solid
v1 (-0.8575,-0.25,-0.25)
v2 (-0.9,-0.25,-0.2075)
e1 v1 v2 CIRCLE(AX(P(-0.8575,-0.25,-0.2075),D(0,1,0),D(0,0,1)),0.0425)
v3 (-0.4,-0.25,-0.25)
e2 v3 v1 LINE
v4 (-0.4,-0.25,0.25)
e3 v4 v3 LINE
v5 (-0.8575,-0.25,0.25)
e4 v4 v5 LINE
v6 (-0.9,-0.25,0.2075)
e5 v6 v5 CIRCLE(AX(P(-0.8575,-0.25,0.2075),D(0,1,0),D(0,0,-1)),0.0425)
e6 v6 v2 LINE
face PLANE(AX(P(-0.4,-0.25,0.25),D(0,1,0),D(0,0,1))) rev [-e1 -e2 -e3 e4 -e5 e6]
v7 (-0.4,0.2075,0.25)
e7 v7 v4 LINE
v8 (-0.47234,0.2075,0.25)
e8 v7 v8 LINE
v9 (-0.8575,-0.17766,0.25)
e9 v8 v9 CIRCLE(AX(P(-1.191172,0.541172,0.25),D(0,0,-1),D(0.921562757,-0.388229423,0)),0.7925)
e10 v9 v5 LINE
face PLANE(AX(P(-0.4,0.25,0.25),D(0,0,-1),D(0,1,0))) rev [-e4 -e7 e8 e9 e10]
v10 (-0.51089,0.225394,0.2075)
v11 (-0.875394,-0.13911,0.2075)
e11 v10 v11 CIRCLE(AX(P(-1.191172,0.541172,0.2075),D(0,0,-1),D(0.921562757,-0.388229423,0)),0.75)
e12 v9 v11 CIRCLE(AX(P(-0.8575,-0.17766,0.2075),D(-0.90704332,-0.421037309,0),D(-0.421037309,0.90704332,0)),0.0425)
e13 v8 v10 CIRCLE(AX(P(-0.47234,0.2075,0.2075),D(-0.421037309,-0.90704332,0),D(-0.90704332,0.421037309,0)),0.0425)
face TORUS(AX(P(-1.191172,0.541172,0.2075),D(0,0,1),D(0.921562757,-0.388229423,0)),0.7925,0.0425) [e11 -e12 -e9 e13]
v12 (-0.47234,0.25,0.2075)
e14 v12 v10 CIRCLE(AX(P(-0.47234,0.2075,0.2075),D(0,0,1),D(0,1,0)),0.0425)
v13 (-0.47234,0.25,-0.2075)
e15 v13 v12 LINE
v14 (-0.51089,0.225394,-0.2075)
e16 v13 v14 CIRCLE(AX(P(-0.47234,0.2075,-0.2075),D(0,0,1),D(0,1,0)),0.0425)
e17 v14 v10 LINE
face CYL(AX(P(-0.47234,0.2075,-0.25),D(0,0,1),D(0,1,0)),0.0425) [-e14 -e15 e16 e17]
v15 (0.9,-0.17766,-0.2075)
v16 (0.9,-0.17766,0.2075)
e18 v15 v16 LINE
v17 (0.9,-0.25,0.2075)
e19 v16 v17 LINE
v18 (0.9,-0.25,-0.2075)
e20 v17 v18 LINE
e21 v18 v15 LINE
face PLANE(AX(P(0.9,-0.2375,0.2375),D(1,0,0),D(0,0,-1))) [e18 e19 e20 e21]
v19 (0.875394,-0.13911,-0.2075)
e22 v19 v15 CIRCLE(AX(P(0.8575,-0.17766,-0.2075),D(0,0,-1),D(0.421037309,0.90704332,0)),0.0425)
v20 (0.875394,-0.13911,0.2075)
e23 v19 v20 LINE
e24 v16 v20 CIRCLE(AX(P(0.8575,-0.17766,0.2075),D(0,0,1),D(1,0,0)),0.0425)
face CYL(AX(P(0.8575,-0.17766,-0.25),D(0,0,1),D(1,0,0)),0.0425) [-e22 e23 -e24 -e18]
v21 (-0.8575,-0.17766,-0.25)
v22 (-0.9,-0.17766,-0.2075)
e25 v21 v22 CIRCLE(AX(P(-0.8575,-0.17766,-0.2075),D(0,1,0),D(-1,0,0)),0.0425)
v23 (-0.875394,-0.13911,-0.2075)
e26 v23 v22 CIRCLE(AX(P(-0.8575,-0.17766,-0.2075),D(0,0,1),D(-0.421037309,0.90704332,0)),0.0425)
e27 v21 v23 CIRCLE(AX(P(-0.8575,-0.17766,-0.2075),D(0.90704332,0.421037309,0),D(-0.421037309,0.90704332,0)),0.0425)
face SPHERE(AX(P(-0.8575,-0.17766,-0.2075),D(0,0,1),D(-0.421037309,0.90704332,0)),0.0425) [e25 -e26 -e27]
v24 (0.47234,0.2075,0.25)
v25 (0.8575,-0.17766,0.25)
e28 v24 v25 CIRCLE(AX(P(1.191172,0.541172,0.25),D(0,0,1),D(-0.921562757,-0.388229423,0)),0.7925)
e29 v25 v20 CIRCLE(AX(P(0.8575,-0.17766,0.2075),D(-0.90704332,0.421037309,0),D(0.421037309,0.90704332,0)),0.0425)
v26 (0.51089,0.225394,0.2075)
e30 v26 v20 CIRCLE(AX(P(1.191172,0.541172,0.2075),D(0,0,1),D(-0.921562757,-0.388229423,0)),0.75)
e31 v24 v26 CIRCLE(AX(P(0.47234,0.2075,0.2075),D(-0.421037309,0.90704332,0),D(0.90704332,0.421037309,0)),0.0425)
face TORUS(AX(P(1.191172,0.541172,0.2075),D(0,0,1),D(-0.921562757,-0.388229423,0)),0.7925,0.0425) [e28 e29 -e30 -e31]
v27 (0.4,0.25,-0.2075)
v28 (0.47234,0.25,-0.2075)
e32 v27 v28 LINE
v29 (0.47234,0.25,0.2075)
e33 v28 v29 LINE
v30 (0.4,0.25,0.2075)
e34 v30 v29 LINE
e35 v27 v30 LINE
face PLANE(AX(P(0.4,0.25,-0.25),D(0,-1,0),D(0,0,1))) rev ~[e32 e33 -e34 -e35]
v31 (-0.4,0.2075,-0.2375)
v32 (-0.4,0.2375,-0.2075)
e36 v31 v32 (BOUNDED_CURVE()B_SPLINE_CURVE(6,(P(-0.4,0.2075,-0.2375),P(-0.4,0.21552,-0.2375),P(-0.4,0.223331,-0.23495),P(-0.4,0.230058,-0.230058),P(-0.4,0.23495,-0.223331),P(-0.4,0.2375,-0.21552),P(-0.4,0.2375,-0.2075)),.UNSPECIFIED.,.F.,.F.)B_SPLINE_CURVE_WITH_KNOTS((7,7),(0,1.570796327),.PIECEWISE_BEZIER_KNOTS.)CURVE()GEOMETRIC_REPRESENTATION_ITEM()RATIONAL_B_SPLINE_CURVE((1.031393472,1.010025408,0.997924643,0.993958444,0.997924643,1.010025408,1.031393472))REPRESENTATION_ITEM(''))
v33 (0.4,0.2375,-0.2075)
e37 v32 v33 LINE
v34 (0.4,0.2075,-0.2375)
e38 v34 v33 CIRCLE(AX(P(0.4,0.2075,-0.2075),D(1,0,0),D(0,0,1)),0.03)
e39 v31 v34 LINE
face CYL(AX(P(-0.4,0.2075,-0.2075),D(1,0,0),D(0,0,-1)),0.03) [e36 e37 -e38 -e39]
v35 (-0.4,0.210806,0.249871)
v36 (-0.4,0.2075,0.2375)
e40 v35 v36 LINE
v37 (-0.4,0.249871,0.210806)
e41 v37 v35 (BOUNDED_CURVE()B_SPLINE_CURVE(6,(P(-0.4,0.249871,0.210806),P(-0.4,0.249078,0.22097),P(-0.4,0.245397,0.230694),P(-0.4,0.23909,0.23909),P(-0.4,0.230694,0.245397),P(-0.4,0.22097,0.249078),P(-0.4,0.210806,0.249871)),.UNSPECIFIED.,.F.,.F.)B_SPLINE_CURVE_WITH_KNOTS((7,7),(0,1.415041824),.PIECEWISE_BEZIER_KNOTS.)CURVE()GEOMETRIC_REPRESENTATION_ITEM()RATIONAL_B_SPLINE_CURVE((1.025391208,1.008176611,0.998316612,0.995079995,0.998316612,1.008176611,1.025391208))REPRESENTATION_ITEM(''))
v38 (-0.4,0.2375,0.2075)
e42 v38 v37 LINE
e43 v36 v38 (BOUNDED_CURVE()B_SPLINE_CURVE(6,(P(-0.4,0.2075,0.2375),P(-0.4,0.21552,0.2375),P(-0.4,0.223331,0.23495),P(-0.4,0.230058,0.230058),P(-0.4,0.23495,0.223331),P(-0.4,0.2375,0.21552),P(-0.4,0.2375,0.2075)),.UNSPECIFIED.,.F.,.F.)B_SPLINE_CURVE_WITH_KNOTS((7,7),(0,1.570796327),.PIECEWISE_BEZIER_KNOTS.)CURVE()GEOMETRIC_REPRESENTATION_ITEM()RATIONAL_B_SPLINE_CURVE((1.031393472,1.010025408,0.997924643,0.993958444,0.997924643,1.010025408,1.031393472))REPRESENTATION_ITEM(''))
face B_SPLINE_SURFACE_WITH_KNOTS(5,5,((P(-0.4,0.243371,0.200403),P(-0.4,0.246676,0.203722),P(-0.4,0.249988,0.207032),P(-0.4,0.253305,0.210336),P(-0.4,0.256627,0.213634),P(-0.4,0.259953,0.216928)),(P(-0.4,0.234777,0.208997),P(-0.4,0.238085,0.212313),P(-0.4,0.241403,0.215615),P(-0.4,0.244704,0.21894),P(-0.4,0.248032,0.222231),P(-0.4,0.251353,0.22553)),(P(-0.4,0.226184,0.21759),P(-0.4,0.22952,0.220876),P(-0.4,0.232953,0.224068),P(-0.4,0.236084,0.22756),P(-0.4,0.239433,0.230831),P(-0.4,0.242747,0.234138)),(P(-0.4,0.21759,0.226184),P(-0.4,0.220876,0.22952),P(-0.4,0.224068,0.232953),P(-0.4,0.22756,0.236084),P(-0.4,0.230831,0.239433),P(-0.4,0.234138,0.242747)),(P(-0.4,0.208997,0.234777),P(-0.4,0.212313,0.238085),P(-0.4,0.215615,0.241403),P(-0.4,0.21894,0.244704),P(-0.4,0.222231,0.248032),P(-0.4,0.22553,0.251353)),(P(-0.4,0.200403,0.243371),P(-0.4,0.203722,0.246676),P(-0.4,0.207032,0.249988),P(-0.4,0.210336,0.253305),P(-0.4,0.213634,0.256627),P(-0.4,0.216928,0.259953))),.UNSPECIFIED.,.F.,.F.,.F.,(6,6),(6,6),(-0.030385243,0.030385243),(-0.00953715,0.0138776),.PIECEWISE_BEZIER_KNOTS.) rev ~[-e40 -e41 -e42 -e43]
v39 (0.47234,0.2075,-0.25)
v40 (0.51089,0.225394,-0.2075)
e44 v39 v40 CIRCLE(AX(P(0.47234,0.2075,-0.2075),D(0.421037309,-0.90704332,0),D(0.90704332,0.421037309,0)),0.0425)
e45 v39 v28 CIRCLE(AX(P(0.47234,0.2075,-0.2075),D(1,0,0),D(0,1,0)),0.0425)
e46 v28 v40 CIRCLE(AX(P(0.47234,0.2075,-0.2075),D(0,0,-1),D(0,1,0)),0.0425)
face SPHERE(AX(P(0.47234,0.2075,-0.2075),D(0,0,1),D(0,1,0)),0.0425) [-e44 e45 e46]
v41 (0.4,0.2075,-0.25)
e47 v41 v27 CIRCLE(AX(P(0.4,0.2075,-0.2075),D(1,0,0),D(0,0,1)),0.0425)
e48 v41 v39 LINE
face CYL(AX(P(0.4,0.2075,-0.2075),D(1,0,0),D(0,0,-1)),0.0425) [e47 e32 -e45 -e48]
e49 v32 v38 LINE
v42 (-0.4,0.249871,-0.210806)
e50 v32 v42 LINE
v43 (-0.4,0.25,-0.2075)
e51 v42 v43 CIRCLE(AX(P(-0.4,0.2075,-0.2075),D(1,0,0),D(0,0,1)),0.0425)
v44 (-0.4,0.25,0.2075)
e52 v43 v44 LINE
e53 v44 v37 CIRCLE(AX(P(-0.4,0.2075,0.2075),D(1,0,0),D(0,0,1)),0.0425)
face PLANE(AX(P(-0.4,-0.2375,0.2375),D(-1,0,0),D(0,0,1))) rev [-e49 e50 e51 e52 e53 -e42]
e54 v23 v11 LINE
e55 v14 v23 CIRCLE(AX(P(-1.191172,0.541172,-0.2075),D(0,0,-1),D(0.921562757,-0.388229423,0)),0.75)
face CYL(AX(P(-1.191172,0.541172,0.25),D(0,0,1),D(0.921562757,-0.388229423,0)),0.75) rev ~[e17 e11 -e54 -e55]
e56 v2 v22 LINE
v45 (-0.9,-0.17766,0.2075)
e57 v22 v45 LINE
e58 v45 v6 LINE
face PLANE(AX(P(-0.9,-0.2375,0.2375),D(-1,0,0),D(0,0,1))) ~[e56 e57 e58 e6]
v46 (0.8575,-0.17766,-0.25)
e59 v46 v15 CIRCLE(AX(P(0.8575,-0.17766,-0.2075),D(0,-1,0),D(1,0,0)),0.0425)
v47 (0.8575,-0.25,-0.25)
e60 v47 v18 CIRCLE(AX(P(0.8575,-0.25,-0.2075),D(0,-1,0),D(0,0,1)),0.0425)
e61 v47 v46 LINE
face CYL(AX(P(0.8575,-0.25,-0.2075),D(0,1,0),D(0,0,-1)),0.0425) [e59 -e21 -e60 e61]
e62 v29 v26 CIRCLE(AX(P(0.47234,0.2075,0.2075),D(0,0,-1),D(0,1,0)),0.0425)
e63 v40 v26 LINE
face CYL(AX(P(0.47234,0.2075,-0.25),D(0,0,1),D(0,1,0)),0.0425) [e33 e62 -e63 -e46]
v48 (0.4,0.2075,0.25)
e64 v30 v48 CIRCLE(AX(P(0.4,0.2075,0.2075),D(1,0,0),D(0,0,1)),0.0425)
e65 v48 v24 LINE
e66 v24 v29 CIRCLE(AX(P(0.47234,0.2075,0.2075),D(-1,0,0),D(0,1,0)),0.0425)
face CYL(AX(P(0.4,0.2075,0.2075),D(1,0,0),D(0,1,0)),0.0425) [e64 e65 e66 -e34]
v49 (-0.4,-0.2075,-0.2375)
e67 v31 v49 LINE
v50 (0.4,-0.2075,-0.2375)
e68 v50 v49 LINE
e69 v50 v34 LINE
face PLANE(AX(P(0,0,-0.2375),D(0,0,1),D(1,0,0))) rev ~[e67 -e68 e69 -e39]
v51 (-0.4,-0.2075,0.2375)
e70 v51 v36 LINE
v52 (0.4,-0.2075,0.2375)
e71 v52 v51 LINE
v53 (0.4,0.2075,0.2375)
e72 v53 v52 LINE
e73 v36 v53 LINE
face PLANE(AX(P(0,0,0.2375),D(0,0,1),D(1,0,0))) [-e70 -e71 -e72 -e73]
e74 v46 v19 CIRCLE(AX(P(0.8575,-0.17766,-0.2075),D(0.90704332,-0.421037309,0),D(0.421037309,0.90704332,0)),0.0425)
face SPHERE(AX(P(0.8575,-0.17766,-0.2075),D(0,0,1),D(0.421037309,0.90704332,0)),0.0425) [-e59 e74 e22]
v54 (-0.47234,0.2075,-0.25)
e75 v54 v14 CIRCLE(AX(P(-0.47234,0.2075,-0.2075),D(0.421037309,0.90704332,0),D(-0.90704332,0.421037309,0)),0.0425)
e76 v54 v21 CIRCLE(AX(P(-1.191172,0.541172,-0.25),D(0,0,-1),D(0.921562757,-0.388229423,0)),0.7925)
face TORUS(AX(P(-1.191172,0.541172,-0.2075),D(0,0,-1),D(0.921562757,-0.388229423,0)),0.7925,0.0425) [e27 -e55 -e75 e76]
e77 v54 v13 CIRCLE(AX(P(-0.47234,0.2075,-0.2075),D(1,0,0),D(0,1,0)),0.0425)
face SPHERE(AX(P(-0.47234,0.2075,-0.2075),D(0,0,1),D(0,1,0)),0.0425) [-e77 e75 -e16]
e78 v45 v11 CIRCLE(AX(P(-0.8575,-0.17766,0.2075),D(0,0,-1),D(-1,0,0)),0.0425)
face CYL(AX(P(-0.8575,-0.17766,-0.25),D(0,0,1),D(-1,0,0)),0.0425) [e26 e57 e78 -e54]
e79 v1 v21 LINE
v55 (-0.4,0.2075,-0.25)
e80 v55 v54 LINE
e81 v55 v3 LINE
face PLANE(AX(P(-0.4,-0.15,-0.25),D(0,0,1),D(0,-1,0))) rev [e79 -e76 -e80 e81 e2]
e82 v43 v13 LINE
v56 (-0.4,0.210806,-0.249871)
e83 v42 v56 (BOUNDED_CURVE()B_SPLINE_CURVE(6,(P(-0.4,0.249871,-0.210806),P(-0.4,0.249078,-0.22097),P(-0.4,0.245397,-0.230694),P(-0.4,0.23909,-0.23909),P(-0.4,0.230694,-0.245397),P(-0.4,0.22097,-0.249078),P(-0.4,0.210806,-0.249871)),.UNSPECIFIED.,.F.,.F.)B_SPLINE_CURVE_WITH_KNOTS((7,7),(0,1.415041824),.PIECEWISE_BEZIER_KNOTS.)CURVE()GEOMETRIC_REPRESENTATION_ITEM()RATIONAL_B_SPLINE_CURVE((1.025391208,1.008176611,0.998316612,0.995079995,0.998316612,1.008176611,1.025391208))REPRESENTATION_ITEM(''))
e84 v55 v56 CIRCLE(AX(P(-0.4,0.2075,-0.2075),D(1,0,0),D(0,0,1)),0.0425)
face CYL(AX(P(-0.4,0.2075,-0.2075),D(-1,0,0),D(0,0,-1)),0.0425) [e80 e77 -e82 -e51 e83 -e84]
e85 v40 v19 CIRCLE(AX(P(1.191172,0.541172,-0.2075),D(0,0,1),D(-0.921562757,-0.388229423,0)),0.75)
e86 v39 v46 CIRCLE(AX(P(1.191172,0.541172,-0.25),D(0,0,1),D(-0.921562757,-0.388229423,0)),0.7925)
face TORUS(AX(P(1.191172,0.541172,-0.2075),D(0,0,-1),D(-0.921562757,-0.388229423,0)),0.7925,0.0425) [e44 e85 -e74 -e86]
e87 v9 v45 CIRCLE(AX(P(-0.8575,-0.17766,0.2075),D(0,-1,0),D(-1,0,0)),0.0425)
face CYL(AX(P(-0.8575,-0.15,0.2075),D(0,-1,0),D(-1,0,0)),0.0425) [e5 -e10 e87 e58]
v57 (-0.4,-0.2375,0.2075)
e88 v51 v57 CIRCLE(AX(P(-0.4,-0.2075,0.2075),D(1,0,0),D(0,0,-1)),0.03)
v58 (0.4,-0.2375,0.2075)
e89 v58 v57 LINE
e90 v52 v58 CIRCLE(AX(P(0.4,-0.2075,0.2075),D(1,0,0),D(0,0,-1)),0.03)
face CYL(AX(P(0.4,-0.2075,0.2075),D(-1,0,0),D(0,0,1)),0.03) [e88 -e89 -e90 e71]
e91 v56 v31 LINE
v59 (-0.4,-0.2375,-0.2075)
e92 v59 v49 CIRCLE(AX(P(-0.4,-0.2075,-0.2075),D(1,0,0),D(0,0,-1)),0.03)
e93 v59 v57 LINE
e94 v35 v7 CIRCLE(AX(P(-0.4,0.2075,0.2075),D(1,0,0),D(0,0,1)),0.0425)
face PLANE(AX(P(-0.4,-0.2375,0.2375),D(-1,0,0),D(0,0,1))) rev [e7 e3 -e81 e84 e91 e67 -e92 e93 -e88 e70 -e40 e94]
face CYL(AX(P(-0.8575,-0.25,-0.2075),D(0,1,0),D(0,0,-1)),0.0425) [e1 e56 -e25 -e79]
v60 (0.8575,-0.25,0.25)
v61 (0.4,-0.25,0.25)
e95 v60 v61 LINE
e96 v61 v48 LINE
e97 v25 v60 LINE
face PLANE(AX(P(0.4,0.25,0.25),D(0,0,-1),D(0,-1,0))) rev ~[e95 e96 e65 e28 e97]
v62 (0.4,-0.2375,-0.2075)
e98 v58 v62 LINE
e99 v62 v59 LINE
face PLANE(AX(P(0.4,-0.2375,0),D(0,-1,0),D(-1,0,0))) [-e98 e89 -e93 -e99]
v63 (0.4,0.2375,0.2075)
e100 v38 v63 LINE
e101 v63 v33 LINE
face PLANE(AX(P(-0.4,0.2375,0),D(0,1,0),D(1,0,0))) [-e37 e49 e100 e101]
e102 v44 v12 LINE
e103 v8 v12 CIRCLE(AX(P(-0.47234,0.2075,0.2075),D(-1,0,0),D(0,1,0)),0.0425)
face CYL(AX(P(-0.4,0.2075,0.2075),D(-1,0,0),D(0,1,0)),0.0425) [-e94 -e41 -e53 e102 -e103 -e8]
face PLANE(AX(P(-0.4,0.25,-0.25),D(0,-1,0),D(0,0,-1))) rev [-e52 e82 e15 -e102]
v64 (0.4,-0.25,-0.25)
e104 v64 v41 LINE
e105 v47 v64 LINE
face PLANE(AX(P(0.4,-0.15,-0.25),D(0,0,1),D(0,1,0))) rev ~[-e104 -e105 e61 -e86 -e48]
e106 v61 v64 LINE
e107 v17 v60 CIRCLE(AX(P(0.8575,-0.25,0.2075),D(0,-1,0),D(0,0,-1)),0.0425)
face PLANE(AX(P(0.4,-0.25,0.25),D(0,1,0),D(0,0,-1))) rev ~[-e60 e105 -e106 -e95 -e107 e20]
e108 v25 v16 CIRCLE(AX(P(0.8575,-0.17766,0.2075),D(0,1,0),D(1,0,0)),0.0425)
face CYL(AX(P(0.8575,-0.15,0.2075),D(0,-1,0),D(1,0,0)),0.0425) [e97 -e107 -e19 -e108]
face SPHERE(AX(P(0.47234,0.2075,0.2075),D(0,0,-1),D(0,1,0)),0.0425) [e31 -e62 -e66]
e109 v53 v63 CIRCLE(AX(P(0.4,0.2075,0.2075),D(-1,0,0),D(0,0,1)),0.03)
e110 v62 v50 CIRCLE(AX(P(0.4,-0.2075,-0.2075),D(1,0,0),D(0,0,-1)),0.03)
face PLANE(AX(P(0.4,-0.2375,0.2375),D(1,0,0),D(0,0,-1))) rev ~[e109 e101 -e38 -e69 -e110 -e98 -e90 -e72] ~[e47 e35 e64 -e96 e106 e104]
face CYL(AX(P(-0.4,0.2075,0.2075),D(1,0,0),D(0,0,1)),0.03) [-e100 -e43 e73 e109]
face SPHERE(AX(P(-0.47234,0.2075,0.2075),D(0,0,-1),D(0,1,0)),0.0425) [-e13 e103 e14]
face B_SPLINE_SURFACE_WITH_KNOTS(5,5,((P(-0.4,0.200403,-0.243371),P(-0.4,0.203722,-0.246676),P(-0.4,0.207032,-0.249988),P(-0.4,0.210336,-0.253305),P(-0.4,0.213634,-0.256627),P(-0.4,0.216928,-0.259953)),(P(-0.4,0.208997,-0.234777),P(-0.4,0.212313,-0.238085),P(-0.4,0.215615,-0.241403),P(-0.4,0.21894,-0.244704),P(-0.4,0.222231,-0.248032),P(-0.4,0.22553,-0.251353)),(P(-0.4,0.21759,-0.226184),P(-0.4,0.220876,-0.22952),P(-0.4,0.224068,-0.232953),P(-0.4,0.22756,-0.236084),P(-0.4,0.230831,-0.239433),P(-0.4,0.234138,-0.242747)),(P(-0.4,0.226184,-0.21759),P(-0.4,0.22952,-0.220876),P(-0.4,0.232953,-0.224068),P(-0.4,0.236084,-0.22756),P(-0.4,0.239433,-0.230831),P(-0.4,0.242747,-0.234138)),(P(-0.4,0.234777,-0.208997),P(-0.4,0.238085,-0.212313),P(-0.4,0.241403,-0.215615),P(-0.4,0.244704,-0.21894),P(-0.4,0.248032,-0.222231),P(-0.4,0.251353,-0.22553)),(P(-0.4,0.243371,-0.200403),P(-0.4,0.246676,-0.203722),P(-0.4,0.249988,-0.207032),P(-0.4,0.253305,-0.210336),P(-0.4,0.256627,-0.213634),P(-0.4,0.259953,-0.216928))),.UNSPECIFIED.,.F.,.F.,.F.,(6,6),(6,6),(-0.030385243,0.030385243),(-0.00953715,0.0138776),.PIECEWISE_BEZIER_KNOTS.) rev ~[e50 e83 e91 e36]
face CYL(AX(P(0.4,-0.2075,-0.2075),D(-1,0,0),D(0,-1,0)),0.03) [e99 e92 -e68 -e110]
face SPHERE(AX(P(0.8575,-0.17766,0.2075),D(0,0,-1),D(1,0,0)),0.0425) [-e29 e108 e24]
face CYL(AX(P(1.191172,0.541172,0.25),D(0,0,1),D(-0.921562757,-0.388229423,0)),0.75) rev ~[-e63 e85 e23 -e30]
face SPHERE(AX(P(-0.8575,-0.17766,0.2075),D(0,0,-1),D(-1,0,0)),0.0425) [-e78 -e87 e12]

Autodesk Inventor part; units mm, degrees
ref_plane "YZ Plane" through (0, 0, 0) normal (1, 0, 0) x (0, 1, 0)
ref_plane "XZ Plane" through (0, 0, 0) normal (0, 1, 0) x (-1, 0, 0)
ref_plane "XY Plane" through (0, 0, 0) normal (0, 0, 1) x (1, 0, 0)
sketch "Sketch10" plane through (0, 0, 0) normal (0, 0, 1) x (1, 0, 0)
  line L0 (-0.4, 0.2375) -> (0.4, 0.2375)
  line L1 (0.4, 0.2375) -> (0.4, -0.2375)
  line L2 (0.4, -0.2375) -> (-0.4, -0.2375)
  line L3 (-0.4, -0.2375) -> (-0.4, 0.2375)
  point P0 (0, 0)
  point P1 (-0.4, 0)
  point P2 (0, 0.2375)
  dimension "d7" = 0.8
  dimension "d8" = 0.475
extrude "Extrusion4" add sketch "Sketch10" along normal mid plane 0.475
sketch "Sketch11" plane through (0.4, -0.2375, 0.2375) normal (1, 0, 0) x (0, 0, -1)
  line L0 (0, 0.475) -> (0.475, 0.475) construction
  line L1 (0, 0) -> (0, 0.475) construction
  line L2 (0, 0) -> (0.475, 0) construction
  line L3 (0.475, 0.475) -> (0.475, 0) construction
  line L4 (0.4875, 0.4875) -> (-0.0125, 0.4875)
  line L5 (-0.0125, 0.4875) -> (-0.0125, -0.0125)
  line L6 (-0.0125, -0.0125) -> (0.4875, -0.0125)
  line L7 (0.4875, -0.0125) -> (0.4875, 0.4875)
  line L8 (-0.0125, -0.0125) -> (0.4875, -0.0125)
  line L9 (0.4875, -0.0125) -> (0.4875, 0.0875)
  line L10 (0.4875, 0.0875) -> (-0.0125, 0.0875)
  line L11 (-0.0125, 0.0875) -> (-0.0125, -0.0125)
  point P0 (0.2375, 0.2375)
  dimension "d11" = 0.5
  dimension "d14" = 0.1
extrude "Extrusion5" add sketch "Sketch11" along normal blind 0.1
extrude "Extrusion6" add sketch "Sketch11" along normal blind 0.5 contours L7 L6 L5 L10
fillet "Fillet1" radius 0.75 1 edges at (0.5, -0.15, 0)
fillet "Fillet2" radius 0.0425 8 edges at (0.45, 0.25, -0.25) (0.45, 0.25, 0.25) (0.6608, 0.0108, 0.25) (0.6608, 0.0108, -0.25) (0.9, -0.2, -0.25) (0.9, -0.15, 0) (0.9, -0.2, 0.25) (0.5, 0.25, 0)
mirror "Mirror1" about plane through (0, 0, 0) normal (1, 0, 0) of "Extrusion5", "Fillet1", "Fillet2", "Extrusion6"
fillet "Fillet3" radius 0.03 4 edges at (0, 0.2375, -0.2375) (0, 0.2375, 0.2375) (0, -0.2375, -0.2375) (0, -0.2375, 0.2375)
equation "\"d9\" = d8"
properties part number "TDK C1005 Capacitor" material "Laminate, Ivory, Matte"
